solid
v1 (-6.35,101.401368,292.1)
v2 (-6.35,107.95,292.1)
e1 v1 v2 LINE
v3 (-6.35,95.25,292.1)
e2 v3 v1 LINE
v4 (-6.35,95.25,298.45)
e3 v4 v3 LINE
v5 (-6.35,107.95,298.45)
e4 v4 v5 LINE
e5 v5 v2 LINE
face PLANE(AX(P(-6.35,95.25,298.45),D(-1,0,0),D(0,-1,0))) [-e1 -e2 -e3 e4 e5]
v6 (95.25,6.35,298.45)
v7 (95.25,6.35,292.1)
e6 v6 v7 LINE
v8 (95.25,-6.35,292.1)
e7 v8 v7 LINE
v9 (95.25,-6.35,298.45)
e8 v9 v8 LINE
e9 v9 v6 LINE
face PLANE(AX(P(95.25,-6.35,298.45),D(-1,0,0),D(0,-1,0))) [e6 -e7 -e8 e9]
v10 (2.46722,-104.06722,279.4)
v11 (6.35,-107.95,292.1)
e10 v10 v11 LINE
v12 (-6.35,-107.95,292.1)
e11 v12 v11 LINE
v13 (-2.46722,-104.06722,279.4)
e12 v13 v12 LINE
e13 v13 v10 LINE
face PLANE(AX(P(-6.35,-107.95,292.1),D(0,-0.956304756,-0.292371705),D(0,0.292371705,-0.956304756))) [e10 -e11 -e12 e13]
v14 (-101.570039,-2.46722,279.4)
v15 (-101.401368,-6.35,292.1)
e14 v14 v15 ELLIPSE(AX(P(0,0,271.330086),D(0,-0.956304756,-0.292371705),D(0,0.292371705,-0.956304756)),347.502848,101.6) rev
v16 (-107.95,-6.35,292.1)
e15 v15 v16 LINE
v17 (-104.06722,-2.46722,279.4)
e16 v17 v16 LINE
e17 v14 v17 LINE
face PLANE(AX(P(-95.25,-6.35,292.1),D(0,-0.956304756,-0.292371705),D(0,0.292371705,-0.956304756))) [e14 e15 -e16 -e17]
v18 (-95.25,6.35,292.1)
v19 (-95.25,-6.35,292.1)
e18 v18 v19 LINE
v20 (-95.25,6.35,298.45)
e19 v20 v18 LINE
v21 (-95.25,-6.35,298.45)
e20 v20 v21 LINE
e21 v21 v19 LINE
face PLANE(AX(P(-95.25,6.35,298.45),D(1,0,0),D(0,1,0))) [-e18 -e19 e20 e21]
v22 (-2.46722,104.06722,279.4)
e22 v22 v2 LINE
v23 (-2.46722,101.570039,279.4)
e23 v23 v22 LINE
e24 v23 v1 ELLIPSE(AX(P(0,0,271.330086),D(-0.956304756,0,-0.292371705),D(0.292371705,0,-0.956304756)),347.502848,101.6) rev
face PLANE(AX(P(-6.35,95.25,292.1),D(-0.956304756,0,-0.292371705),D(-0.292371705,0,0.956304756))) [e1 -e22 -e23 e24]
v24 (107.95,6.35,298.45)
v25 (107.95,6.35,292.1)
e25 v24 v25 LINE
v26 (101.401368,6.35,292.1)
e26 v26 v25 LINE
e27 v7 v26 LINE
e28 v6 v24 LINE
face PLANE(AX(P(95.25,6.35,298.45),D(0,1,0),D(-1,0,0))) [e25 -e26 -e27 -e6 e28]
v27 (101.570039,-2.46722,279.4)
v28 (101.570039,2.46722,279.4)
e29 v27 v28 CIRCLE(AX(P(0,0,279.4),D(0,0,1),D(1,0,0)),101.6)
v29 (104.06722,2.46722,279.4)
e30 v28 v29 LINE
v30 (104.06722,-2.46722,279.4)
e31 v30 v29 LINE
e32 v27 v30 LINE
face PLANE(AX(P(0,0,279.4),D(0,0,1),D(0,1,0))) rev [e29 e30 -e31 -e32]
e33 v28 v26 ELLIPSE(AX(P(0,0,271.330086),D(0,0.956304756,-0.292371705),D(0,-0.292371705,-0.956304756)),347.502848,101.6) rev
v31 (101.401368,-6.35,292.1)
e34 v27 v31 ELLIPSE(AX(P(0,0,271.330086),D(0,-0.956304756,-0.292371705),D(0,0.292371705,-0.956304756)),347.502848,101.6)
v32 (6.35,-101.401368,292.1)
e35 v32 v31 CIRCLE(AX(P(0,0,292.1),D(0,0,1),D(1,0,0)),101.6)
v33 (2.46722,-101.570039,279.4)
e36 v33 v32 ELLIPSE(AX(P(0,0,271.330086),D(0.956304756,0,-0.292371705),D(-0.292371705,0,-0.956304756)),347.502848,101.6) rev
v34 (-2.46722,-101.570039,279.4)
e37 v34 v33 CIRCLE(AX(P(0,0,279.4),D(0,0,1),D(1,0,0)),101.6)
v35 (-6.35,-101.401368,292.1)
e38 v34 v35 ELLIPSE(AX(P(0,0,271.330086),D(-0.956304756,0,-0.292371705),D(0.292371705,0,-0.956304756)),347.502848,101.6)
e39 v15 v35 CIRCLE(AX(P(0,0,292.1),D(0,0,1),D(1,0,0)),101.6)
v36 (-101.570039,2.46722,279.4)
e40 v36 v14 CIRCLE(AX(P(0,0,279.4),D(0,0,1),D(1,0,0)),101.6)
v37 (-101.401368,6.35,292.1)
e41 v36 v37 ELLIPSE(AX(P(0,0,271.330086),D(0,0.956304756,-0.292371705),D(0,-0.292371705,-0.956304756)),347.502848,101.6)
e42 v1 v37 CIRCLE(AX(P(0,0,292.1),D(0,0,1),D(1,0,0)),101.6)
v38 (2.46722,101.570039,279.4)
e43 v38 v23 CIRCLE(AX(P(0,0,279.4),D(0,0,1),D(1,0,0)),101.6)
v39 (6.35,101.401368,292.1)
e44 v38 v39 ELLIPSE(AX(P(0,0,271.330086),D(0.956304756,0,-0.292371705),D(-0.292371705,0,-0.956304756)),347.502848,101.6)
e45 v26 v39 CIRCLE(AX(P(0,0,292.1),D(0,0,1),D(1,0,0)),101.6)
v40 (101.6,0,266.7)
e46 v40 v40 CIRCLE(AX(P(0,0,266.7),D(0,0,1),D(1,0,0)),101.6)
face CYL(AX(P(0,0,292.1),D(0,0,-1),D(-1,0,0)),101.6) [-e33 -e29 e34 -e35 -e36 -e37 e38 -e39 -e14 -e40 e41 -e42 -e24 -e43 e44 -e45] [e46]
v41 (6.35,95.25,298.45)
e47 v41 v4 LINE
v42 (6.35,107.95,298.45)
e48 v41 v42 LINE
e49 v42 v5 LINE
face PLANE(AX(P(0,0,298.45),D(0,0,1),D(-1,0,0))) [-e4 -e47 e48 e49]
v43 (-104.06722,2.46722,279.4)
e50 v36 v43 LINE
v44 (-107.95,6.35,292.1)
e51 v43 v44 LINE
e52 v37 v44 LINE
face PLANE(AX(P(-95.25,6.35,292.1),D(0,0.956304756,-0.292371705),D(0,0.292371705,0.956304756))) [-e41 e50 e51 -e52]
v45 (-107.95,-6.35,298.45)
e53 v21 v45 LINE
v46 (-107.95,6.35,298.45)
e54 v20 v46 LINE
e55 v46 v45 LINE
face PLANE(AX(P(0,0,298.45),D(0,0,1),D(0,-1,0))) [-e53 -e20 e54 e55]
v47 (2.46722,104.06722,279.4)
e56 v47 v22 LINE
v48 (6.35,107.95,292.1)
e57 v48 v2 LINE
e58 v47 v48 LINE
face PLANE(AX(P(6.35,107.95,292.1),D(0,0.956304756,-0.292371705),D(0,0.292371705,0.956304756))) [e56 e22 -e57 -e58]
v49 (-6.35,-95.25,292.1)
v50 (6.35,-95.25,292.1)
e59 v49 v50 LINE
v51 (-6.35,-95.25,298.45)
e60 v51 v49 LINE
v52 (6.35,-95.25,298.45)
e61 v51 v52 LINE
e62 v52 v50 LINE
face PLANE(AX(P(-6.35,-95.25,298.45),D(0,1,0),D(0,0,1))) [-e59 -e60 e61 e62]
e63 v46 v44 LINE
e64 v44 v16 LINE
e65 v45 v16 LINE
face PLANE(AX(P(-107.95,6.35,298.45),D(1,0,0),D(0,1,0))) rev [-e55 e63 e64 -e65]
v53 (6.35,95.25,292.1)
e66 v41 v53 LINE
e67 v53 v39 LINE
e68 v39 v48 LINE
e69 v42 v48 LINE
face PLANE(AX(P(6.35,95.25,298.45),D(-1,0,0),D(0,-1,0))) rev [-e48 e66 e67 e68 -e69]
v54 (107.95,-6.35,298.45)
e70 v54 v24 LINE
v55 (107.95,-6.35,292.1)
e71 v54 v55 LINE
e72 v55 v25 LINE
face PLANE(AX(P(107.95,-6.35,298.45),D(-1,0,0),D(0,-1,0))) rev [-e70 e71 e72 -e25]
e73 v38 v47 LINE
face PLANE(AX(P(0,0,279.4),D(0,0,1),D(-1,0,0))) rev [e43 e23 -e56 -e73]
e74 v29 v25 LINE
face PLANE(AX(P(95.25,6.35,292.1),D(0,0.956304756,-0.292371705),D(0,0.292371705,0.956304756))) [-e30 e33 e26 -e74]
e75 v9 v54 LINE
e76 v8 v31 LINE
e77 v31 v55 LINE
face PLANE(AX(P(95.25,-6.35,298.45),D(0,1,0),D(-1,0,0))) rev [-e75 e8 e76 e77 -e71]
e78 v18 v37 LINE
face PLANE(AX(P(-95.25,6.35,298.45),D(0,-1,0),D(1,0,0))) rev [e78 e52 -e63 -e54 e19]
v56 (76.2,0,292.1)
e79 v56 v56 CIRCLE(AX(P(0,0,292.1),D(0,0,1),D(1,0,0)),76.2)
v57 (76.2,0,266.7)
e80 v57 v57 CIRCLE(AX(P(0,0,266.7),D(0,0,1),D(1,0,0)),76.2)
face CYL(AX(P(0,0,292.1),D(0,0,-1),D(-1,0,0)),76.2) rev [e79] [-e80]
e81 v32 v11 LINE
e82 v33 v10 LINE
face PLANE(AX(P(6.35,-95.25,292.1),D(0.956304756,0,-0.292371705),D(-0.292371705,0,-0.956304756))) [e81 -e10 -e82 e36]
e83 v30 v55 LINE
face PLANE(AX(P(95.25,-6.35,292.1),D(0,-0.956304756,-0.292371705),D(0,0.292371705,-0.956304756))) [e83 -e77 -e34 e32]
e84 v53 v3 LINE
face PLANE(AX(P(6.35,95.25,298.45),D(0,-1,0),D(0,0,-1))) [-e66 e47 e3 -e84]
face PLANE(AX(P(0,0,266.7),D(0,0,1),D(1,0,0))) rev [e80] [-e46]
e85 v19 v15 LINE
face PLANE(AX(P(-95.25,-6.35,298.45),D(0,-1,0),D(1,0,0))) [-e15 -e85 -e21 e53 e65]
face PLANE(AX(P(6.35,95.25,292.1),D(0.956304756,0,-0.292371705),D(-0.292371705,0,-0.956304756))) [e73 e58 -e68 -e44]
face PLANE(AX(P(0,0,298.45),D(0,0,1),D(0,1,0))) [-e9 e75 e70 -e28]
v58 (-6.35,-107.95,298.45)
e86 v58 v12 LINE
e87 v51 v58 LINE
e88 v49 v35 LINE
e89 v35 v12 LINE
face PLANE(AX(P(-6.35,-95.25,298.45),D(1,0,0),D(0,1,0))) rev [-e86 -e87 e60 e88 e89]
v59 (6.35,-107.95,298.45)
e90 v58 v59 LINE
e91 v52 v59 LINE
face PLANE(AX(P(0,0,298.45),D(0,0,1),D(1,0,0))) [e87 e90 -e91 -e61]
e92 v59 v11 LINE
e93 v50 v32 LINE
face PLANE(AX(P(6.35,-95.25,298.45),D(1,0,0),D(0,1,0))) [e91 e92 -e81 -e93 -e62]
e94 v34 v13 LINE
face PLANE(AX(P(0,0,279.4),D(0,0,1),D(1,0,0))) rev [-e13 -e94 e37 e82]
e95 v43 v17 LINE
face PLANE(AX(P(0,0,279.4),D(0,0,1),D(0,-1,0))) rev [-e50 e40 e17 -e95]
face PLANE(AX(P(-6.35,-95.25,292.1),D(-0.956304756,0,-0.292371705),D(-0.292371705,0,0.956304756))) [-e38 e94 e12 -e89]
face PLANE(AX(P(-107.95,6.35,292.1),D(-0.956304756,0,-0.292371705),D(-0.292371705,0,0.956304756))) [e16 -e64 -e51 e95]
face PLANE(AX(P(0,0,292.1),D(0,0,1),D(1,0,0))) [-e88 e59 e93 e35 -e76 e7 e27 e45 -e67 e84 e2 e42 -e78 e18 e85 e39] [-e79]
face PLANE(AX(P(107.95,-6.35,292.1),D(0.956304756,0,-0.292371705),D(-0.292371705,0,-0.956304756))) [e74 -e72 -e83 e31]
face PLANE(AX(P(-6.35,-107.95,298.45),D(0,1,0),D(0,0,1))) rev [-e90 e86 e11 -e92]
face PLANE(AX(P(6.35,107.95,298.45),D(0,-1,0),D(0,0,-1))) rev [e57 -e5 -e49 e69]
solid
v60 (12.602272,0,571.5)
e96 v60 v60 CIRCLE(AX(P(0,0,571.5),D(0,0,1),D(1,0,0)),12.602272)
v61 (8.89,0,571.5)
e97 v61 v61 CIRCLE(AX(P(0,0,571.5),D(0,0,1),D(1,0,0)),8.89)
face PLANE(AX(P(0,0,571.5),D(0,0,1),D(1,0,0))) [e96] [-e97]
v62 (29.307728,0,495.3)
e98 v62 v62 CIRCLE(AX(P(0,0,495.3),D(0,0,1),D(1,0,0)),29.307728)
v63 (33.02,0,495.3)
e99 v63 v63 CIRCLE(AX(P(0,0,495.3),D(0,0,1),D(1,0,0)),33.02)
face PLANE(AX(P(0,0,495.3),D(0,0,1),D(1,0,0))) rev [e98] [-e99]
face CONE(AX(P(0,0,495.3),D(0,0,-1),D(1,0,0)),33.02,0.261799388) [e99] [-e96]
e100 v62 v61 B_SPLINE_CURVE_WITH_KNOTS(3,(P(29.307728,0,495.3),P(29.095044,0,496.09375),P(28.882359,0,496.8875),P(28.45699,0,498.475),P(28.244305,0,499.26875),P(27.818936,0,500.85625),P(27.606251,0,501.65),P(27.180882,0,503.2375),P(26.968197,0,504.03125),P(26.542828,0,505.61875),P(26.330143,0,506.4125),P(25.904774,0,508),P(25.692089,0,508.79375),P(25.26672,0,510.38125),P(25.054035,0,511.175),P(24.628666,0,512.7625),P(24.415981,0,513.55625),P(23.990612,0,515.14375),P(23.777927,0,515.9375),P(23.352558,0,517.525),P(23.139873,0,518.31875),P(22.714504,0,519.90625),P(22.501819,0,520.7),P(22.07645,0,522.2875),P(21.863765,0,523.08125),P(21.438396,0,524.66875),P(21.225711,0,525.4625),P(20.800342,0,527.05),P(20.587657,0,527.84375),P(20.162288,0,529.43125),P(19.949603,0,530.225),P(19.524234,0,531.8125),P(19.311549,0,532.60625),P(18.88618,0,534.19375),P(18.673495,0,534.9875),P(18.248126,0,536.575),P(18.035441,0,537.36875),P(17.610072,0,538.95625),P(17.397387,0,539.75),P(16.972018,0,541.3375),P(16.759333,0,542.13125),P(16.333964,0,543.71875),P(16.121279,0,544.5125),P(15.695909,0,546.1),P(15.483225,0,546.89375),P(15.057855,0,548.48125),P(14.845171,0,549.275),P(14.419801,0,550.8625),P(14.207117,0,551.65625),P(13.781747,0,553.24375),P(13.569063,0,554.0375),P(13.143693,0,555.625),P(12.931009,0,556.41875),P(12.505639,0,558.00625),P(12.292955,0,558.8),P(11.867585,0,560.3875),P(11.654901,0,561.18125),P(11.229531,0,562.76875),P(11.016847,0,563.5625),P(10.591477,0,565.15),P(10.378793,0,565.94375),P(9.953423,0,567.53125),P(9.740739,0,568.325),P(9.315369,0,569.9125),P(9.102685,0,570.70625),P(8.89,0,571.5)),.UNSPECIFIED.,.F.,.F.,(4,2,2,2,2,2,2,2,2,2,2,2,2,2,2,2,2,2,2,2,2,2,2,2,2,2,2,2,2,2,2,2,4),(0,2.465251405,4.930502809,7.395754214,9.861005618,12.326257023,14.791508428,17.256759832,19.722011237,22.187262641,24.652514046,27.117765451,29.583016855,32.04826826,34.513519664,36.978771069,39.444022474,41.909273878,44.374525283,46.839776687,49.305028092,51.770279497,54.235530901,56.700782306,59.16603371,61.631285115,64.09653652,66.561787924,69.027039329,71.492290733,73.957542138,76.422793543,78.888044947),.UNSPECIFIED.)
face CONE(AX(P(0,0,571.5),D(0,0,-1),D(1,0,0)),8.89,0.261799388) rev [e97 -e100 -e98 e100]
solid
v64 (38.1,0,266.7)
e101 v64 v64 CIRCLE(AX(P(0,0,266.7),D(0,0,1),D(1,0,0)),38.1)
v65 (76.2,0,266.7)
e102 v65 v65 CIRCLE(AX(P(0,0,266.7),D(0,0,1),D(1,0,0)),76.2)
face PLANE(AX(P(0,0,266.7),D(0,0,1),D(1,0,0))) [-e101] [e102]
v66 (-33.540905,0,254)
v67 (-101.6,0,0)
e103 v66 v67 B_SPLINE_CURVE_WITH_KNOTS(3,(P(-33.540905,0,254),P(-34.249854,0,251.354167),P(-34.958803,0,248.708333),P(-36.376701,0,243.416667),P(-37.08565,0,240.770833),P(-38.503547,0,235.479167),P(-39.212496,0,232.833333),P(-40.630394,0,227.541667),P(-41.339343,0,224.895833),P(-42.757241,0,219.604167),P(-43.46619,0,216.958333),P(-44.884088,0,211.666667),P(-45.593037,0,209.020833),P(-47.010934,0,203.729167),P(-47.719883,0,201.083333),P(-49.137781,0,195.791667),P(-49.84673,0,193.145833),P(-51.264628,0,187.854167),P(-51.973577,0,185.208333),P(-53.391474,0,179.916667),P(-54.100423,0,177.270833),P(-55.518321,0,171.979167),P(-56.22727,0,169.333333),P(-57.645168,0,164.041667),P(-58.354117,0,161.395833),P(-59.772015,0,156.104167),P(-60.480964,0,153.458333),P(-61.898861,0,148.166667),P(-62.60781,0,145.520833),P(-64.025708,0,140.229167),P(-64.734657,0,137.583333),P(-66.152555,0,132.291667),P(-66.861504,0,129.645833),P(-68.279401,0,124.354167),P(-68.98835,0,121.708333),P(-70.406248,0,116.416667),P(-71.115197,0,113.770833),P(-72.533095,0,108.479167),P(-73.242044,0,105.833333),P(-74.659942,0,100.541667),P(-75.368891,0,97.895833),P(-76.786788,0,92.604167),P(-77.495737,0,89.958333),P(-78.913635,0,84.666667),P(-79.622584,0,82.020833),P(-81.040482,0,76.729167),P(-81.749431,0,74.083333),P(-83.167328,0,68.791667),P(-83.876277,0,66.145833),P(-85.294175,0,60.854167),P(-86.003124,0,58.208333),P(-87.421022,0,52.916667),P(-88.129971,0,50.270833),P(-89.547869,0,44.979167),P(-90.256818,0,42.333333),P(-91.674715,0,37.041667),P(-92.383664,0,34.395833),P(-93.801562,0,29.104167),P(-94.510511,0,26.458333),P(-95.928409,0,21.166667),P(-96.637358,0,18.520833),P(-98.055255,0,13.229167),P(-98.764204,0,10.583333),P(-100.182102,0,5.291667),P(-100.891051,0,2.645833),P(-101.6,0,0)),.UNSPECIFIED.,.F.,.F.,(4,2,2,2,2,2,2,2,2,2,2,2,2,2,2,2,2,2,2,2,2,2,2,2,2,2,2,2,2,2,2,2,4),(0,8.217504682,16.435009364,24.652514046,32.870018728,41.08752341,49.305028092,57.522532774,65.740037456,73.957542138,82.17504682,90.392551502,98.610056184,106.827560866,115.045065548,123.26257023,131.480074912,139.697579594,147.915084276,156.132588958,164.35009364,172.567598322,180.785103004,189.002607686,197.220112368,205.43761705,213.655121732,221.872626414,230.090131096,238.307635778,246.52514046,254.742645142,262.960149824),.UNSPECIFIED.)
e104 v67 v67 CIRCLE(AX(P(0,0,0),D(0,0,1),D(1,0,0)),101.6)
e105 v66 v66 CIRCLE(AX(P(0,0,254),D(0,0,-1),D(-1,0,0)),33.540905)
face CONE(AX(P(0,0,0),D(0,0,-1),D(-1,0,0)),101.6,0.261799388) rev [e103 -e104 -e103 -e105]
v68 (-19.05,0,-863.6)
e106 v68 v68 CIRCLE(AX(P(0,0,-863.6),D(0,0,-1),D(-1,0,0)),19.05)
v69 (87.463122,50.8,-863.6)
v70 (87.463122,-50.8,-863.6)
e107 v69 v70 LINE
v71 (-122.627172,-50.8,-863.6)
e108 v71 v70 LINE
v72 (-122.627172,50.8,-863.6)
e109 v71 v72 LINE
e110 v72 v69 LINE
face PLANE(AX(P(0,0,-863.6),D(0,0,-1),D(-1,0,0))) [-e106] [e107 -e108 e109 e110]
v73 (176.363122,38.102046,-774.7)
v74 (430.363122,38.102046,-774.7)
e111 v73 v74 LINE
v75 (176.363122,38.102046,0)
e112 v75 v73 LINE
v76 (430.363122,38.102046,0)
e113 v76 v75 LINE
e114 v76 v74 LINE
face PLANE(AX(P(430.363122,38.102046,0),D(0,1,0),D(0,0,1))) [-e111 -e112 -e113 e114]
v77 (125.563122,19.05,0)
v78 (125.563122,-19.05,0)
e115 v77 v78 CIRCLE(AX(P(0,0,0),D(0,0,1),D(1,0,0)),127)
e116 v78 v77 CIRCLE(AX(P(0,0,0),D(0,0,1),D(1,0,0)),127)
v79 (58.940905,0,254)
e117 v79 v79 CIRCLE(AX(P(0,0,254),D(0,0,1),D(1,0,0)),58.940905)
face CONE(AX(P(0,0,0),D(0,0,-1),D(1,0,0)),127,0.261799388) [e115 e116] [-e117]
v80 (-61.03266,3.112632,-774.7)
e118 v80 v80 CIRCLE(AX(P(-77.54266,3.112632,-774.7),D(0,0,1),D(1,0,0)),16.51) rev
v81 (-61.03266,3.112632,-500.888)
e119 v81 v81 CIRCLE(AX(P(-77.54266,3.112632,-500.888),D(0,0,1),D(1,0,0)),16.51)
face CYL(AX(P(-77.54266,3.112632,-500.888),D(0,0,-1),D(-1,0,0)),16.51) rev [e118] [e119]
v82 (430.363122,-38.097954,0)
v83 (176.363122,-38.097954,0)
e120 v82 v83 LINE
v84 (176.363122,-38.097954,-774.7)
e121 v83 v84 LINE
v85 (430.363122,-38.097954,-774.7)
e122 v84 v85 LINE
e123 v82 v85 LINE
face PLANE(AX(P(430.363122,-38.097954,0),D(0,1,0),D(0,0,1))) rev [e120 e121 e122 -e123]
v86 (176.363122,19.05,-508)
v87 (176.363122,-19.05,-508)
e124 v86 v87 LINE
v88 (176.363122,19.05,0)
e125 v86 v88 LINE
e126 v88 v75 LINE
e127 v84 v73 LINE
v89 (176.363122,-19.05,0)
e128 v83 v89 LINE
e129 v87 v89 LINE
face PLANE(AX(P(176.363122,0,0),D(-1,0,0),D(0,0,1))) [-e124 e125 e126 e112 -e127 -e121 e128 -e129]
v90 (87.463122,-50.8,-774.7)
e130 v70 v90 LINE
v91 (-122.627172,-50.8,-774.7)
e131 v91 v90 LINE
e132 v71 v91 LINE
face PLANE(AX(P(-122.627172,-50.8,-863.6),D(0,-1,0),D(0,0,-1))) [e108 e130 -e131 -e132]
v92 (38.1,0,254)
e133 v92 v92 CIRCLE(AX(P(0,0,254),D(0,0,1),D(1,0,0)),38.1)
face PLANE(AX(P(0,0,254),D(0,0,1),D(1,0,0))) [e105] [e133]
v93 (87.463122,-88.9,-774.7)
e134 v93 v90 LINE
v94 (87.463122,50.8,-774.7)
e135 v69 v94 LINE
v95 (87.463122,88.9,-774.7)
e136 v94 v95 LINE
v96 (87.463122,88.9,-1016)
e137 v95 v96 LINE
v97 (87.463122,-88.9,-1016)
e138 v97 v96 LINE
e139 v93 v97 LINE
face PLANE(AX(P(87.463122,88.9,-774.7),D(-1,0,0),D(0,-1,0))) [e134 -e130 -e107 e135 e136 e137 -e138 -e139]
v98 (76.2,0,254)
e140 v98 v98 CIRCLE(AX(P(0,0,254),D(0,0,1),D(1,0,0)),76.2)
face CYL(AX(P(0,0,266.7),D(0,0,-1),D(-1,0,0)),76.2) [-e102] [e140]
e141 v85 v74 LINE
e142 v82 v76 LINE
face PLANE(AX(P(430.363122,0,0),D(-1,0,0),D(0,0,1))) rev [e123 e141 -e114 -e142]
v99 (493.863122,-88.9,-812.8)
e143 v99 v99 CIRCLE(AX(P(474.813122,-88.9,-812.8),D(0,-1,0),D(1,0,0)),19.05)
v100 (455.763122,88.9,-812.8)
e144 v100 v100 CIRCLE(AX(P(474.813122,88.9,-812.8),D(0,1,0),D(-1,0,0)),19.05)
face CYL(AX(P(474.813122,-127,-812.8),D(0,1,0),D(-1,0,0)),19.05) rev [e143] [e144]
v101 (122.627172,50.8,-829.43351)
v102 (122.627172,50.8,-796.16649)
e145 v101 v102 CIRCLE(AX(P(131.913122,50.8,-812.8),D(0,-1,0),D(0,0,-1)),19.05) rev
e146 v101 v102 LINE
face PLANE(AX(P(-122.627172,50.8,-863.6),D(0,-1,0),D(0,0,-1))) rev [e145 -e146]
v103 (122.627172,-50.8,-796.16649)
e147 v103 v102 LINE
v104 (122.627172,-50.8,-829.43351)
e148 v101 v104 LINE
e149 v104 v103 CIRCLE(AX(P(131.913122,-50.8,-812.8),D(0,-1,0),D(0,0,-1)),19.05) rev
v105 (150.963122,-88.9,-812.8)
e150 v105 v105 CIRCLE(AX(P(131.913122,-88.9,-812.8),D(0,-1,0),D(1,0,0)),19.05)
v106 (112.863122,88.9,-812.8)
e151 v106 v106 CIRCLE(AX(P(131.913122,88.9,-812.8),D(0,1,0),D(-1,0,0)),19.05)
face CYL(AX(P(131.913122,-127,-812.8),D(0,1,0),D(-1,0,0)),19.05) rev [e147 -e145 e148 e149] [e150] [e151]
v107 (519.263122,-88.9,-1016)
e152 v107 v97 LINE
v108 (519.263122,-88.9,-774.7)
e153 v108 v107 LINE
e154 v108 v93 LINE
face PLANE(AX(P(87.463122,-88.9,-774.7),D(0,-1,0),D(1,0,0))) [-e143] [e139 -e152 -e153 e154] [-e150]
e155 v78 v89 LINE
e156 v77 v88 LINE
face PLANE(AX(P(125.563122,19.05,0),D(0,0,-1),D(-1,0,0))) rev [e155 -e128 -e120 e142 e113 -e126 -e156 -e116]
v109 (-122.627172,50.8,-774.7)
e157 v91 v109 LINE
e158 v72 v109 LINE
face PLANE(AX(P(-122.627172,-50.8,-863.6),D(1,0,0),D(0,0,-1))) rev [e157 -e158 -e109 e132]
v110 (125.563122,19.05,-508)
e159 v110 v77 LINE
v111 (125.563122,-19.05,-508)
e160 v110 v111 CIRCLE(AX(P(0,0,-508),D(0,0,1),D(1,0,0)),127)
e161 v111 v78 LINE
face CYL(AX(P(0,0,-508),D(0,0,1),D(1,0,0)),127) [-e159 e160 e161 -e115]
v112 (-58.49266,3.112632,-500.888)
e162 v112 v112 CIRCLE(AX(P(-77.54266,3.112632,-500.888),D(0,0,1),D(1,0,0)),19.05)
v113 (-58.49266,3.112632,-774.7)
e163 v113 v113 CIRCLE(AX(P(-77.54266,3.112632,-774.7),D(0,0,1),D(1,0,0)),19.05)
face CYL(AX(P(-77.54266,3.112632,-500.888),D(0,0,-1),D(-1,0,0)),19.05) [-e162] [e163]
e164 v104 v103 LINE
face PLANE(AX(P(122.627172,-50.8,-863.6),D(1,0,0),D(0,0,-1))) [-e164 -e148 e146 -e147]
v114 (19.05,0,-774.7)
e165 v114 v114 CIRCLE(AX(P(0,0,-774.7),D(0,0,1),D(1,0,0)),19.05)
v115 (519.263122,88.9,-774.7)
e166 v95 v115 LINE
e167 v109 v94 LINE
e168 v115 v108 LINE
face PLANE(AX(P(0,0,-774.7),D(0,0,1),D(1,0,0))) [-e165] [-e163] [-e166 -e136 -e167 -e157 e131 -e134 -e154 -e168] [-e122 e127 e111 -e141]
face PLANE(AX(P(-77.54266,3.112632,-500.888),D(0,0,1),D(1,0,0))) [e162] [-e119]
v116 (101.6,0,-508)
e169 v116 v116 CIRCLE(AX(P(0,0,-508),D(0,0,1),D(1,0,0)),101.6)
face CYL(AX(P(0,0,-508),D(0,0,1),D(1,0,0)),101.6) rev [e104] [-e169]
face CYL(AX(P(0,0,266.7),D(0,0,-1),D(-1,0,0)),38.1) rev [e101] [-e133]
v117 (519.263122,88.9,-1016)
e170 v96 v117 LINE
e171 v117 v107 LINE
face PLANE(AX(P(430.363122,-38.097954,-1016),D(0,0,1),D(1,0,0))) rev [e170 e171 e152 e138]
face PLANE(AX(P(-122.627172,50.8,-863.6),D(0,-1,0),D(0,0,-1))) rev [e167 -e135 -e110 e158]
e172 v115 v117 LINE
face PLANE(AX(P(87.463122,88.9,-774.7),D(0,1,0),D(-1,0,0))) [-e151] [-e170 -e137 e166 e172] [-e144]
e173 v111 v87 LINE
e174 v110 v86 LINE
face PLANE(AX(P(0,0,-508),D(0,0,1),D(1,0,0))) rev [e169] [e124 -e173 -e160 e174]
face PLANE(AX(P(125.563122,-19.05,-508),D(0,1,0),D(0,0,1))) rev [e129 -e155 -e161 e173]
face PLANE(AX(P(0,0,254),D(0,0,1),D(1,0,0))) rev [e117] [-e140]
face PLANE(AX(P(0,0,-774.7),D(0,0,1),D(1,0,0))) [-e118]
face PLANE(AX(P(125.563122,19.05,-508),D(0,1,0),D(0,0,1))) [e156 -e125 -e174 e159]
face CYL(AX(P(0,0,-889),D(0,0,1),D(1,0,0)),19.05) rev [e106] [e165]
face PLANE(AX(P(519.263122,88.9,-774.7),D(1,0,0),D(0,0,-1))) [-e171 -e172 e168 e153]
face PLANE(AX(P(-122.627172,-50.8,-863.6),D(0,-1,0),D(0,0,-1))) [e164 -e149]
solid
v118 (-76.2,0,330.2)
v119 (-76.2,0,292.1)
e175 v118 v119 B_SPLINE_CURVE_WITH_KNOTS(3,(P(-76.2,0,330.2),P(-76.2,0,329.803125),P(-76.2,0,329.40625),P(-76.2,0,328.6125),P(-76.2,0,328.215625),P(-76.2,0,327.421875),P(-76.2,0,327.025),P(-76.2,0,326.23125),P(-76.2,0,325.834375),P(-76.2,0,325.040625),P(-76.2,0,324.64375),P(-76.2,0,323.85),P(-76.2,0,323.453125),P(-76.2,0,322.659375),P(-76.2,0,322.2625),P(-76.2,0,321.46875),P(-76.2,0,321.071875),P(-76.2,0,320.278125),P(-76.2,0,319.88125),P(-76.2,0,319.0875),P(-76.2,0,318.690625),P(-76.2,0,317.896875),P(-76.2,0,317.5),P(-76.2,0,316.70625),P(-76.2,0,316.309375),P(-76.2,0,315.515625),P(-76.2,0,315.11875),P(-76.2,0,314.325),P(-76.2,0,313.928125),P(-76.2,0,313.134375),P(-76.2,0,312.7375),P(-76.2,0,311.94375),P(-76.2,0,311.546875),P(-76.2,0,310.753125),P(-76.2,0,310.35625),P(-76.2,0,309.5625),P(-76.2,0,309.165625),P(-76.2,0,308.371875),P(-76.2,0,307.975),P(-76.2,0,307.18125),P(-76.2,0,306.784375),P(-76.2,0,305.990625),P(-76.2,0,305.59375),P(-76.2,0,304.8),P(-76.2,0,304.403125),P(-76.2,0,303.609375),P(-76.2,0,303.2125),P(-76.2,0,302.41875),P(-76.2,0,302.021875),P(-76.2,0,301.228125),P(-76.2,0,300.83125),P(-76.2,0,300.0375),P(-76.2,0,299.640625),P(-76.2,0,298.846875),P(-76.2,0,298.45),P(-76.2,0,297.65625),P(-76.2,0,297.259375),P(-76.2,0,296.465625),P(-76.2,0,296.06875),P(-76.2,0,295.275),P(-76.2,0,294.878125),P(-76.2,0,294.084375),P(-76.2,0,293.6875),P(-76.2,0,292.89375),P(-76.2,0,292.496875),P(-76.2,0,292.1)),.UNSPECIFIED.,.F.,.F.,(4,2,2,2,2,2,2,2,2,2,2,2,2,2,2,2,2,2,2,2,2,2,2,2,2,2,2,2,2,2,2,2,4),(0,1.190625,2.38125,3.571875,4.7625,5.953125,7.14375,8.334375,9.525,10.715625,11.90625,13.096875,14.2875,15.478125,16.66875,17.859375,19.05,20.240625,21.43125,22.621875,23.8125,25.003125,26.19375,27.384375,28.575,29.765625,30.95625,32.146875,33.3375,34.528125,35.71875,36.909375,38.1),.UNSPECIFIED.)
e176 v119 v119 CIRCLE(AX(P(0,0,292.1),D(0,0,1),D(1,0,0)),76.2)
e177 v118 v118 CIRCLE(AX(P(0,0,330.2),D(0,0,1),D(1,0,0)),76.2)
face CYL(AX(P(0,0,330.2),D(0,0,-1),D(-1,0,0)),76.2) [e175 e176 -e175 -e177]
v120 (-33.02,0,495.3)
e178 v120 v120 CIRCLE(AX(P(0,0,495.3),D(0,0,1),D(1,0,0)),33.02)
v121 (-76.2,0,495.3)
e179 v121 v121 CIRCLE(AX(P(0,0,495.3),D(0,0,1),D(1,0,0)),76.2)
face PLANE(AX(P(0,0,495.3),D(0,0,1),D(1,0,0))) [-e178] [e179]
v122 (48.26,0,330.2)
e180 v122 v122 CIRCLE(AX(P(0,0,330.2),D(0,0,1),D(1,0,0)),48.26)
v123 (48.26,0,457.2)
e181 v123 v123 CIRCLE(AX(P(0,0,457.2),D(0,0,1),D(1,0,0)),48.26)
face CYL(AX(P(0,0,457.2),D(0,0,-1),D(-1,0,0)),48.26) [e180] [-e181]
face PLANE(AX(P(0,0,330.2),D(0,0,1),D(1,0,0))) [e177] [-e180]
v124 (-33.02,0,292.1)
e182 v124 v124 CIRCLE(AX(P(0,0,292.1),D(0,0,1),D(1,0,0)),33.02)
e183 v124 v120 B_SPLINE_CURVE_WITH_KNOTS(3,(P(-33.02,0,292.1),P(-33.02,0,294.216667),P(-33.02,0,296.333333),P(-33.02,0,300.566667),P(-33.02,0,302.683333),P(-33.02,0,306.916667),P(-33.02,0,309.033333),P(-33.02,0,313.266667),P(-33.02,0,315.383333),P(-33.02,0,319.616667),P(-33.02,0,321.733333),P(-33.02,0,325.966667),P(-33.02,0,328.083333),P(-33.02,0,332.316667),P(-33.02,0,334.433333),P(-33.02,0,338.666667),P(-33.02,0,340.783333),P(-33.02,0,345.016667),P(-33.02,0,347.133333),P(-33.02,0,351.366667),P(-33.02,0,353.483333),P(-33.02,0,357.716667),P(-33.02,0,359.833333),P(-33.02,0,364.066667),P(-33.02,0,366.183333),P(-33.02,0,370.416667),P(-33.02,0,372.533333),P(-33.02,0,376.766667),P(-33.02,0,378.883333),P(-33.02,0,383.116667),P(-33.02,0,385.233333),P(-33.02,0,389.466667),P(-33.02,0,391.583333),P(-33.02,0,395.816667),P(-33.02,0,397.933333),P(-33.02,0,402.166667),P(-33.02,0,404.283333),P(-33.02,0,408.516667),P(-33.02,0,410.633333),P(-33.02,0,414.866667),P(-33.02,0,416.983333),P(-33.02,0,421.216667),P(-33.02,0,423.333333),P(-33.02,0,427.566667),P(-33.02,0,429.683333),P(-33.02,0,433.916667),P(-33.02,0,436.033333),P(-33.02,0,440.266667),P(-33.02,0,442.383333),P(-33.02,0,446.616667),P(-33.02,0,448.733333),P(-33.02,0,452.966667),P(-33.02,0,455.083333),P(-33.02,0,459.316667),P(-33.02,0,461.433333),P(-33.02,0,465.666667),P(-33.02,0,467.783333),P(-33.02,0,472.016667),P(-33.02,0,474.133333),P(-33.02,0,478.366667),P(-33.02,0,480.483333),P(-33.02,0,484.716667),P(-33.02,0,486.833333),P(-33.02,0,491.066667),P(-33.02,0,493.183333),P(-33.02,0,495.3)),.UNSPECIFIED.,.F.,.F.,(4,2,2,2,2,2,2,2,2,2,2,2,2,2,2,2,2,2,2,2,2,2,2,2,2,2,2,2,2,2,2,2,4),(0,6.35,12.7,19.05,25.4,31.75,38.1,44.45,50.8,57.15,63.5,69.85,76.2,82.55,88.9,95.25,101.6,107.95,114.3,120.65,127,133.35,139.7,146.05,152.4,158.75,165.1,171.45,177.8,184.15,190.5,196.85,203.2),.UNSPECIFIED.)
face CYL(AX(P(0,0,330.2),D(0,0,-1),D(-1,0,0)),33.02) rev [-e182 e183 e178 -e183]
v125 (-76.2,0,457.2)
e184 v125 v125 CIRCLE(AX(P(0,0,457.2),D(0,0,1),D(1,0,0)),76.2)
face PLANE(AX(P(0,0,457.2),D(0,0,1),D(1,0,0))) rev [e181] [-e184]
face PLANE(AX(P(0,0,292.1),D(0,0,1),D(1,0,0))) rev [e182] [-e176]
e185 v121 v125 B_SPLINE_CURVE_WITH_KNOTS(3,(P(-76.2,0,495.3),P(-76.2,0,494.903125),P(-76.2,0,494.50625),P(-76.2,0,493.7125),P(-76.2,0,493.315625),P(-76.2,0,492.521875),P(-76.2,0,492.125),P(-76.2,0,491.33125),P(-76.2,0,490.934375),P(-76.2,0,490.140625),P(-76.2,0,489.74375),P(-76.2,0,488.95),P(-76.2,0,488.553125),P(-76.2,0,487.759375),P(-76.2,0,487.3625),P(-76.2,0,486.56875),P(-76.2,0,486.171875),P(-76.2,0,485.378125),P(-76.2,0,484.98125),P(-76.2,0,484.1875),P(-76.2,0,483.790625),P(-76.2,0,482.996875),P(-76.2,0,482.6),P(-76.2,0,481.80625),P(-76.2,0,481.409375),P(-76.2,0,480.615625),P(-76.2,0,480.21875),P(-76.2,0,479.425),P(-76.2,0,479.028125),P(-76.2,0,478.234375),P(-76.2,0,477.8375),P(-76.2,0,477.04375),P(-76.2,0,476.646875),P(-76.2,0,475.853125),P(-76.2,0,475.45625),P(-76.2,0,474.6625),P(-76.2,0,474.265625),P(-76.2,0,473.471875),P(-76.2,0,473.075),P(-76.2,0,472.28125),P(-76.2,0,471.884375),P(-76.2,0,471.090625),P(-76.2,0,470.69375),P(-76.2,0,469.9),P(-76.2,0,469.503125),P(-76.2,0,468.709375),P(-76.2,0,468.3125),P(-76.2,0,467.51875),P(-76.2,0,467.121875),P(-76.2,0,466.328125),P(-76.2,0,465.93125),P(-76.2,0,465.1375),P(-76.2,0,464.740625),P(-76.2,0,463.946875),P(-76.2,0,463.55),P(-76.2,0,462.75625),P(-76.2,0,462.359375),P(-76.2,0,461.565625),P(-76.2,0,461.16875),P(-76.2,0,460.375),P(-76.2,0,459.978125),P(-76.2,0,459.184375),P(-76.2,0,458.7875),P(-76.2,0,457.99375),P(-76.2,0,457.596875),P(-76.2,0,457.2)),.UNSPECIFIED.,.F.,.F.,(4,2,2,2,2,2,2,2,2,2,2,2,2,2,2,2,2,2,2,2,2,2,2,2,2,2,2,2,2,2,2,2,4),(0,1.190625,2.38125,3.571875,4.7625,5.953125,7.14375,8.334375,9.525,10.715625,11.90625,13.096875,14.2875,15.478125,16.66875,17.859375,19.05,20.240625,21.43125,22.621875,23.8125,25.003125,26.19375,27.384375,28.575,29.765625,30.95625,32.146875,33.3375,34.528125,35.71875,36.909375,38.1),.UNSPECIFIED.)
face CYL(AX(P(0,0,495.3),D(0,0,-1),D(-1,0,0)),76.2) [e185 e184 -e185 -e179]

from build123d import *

# Parameters (mm, degrees)
SKETCH1_R                     = 127
BOSS_EXTRUDE1_DEPTH           = 254
BOSS_EXTRUDE1_TAPER           = 15
SKETCH4_R                     = 101.6
CUT_EXTRUDE1_DEPTH            = 254
CUT_EXTRUDE1_DRAFT            = -15
SKETCH1_6_R                   = 127
SKETCH1_6_R_2                 = 101.6
EXTRUDE_THIN2_DEPTH           = 508
SKETCH7_R                     = 76.2
SKETCH7_R_2                   = 38.1
EXTRUDE_THIN3_DEPTH           = 12.7
EXTRUDE_THIN4_START           = 12.7
SKETCH7_3_R                   = 101.6
SKETCH7_3_R_2                 = 76.2
EXTRUDE_THIN4_DEPTH           = 25.4
EXTRUDE_THIN5_START           = 38.1
SKETCH7_4_R                   = 76.2
SKETCH7_4_R_2                 = 33.02
EXTRUDE_THIN5_DEPTH           = 38.1
SKETCH9_R                     = 48.26
SKETCH9_R_2                   = 33.02
EXTRUDE_THIN6_DEPTH           = 127
EXTRUDE_THIN7_START           = 203.2
SKETCH7_6_R                   = 76.2
SKETCH7_6_R_2                 = 33.02
EXTRUDE_THIN7_DEPTH           = 38.1
BOSS_EXTRUDE3_START           = 165.1
SKETCH9_2_R                   = 33.02
BOSS_EXTRUDE3_DEPTH           = 76.2
BOSS_EXTRUDE3_TAPER           = 15
SKETCH10_R                    = 8.89
CUT_EXTRUDE2_DEPTH            = 76.2
CUT_EXTRUDE2_DRAFT            = 15
SKETCH12_W                    = 12.7
SKETCH12_H                    = 12.7
BOSS_EXTRUDE4_DEPTH           = 12.7
BOSS_EXTRUDE4_TAPER           = 17
BOSS_EXTRUDE4_OTHER_WAY_DEPTH = 6.35
CIRPATTERN1_START             = -104.067220345
CIRPATTERN1_DEPTH             = 8.817220345
CIRPATTERN1_START_2           = 95.25
CIRPATTERN1_2_DEPTH           = 8.817220345
CIRPATTERN1_3_DEPTH           = 12.7
CIRPATTERN1_START_3           = -6.35
CIRPATTERN1_4_DEPTH           = 12.7
CIRPATTERN1_START_4           = -95.25
CIRPATTERN1_5_DEPTH           = 190.5
CIRPATTERN1_START_5           = -109
CIRPATTERN1_6_DEPTH           = 4.932779655
CIRPATTERN1_START_6           = 104.067220345
CIRPATTERN1_7_DEPTH           = 4.932779655
BOSS_EXTRUDE14_START          = -508
BOSS_EXTRUDE14_DEPTH          = 508
SKETCH16_W                    = 4.430078534
SKETCH16_H                    = 38.095908877
CUT_EXTRUDE3_DEPTH            = 612.844825099
SKETCH17_W                    = 1016
SKETCH17_H                    = 76.2
BOSS_EXTRUDE15_DEPTH          = 254
SKETCH19_W                    = 431.8
SKETCH19_H                    = 177.8
BOSS_EXTRUDE16_DEPTH          = 241.3
SKETCH22_R                    = 19.05
CUT_EXTRUDE7_DEPTH            = 1162.250618699
SKETCH21_R                    = 19.05
CUT_EXTRUDE8_DEPTH            = 1162.250618699
BOSS_EXTRUDE21_START          = -774.7
SKETCH26_W                    = 245.254344596
SKETCH26_H                    = 101.6
BOSS_EXTRUDE21_DEPTH          = 88.9
CUT_EXTRUDE11_START           = -762
SKETCH27_R                    = 19.05
CUT_EXTRUDE11_DEPTH           = 127
EXTRUDE_THIN8_START           = -774.7
SKETCH26_9_R                  = 19.05
SKETCH26_9_R_2                = 16.51
EXTRUDE_THIN8_DEPTH           = 273.812


with BuildPart() as part:
    # Sketch1 → Boss-Extrude1 (new body)
    with BuildSketch(Plane.XY):
        Circle(SKETCH1_R)
    extrude(amount=BOSS_EXTRUDE1_DEPTH, taper=BOSS_EXTRUDE1_TAPER)


with BuildPart() as cut_extrude1_tool:
    # Sketch4 → Cut-Extrude1 (with draft: the straight prism first)
    with BuildSketch(Plane(origin=(0, 0, 0), x_dir=(-1, 0, 0), z_dir=(0, 0, -1))):
        Circle(SKETCH4_R)
    extrude(amount=-CUT_EXTRUDE1_DEPTH)
    # Cut-Extrude1: the draft: its side faces are tilted about the plane it starts from
    cut_extrude1_sides = [cut_extrude1_tool.faces().sort_by_distance(p)[0] for p in [
        (101.6, 0, 127),
    ]]
    draft(cut_extrude1_sides, Plane(origin=(0, 0, 0), x_dir=(-1, 0, 0), z_dir=(0, 0, -1)), CUT_EXTRUDE1_DRAFT)


with BuildPart() as part_1:
    add(part.part)

    # Cut-Extrude1: cut by cut_extrude1_tool
    add(cut_extrude1_tool.part, mode=Mode.SUBTRACT)

    # Sketch1<6> → Extrude-Thin2 (add)
    with BuildSketch(Plane.XY):
        Circle(SKETCH1_6_R)
        Circle(SKETCH1_6_R_2, mode=Mode.SUBTRACT)
    extrude(amount=-EXTRUDE_THIN2_DEPTH)

    # Sketch7 → Extrude-Thin3 (add)
    with BuildSketch(Plane.XY.offset(254)):
        Circle(SKETCH7_R)
        Circle(SKETCH7_R_2, mode=Mode.SUBTRACT)
    extrude(amount=EXTRUDE_THIN3_DEPTH)

    # Boss-Extrude14: read off the stored shape, not the designer's step
    # Boss-Extrude14 outline → Boss-Extrude14 (add)
    with BuildSketch(Plane.XY.offset(BOSS_EXTRUDE14_START)):
        with BuildLine():
            Line((125.563121576, -19.05), (176.363121576, -19.05))
            ThreePointArc((176.363121576, -19.05), (177.8, 0), (176.363121576, 19.05))
            Line((176.363121576, 19.05), (125.563121576, 19.05))
            ThreePointArc((125.563121576, 19.05), (127, 0), (125.563121576, -19.05))
        make_face()
    extrude(amount=BOSS_EXTRUDE14_DEPTH)

    # Sketch16 → Cut-Extrude3 (cut, through all)
    with BuildSketch(Plane.XY):
        with Locations((178.578160843, 0.002045561)):
            Rectangle(SKETCH16_W, SKETCH16_H)
    extrude(amount=-CUT_EXTRUDE3_DEPTH, mode=Mode.SUBTRACT)

    # Sketch17 → Boss-Extrude15 (add)
    with BuildSketch(Plane(origin=(176.363121576, 0, 0), x_dir=(0, 0, -1), z_dir=(1, 0, 0))):
        with Locations((508, 0.002045562)):
            Rectangle(SKETCH17_W, SKETCH17_H)
    extrude(amount=BOSS_EXTRUDE15_DEPTH)

    # Sketch19 → Boss-Extrude16 (add)
    with BuildSketch(Plane(origin=(0, 0, -1016), x_dir=(-1, 0, 0), z_dir=(0, 0, -1))):
        with Locations((-303.363121576, 0)):
            Rectangle(SKETCH19_W, SKETCH19_H)
    extrude(amount=-BOSS_EXTRUDE16_DEPTH)

    # Sketch22 → Cut-Extrude7 (cut, through all)
    with BuildSketch(Plane(origin=(0, 88.9, 0), x_dir=(1, 0, 0), z_dir=(0, 1, 0))):
        with Locations(Location((131.913121576, 812.8, 0), (0, 0, 180))):
            Circle(SKETCH22_R)
    extrude(amount=-CUT_EXTRUDE7_DEPTH, mode=Mode.SUBTRACT)

    # Sketch21 → Cut-Extrude8 (cut, through all)
    with BuildSketch(Plane(origin=(0, 88.9, 0), x_dir=(1, 0, 0), z_dir=(0, 1, 0))):
        with Locations(Location((474.813121576, 812.8, 0), (0, 0, 180))):
            Circle(SKETCH21_R)
    extrude(amount=-CUT_EXTRUDE8_DEPTH, mode=Mode.SUBTRACT)

    # Sketch26 → Boss-Extrude21 (add)
    with BuildSketch(Plane.XY.offset(BOSS_EXTRUDE21_START)):
        Rectangle(SKETCH26_W, SKETCH26_H)
    extrude(amount=-BOSS_EXTRUDE21_DEPTH)

    # Sketch27 → Cut-Extrude11 (cut)
    with BuildSketch(Plane.XY.offset(CUT_EXTRUDE11_START)):
        Circle(SKETCH27_R)
    extrude(amount=-CUT_EXTRUDE11_DEPTH, mode=Mode.SUBTRACT)

    # Sketch26<9> → Extrude-Thin8 (add)
    with BuildSketch(Plane.XY.offset(EXTRUDE_THIN8_START)):
        with Locations((-77.542660474, 3.112631732)):
            Circle(SKETCH26_9_R)
        with Locations((-77.542660474, 3.112631732)):
            Circle(SKETCH26_9_R_2, mode=Mode.SUBTRACT)
    extrude(amount=EXTRUDE_THIN8_DEPTH)


with BuildPart() as body_2:
    # Sketch7<3> → Extrude-Thin4 (new body)
    with BuildSketch(Plane.XY.offset(254).offset(EXTRUDE_THIN4_START)):
        Circle(SKETCH7_3_R)
        Circle(SKETCH7_3_R_2, mode=Mode.SUBTRACT)
    extrude(amount=EXTRUDE_THIN4_DEPTH)

    # Sketch12 → Boss-Extrude4 (add)
    with BuildSketch(Plane.XY.offset(292.1)):
        with Locations((0, -101.6)):
            Rectangle(SKETCH12_W, SKETCH12_H)
    extrude(amount=-BOSS_EXTRUDE4_DEPTH, taper=BOSS_EXTRUDE4_TAPER)

    # Sketch12 → Boss-Extrude4 other way (add)
    with BuildSketch(Plane.XY.offset(292.1)):
        with Locations((0, -101.6)):
            Rectangle(SKETCH12_W, SKETCH12_H)
    extrude(amount=BOSS_EXTRUDE4_OTHER_WAY_DEPTH)

    # CirPattern1: read off the stored shape, not the designer's step
    # CirPattern1 outline → CirPattern1 (add)
    with BuildSketch(Plane.YZ.offset(CIRPATTERN1_START)):
        Polygon((6.35, 292.1), (6.35, 298.45), (-6.35, 298.45), (-6.35, 292.1), (-2.467220345, 279.4), (2.467220345, 279.4), align=None)
    extrude(amount=CIRPATTERN1_DEPTH)

    # CirPattern1 2 outline → CirPattern1 2 (add)
    with BuildSketch(Plane.YZ.offset(CIRPATTERN1_START_2)):
        Polygon((6.35, 292.1), (6.35, 298.45), (-6.35, 298.45), (-6.35, 292.1), (-2.467220345, 279.4), (2.467220345, 279.4), align=None)
    extrude(amount=CIRPATTERN1_2_DEPTH)

    # CirPattern1 3 outline → CirPattern1 3 (add)
    with BuildSketch(Plane(origin=(0, 0, 0), x_dir=(1, 0, 0), z_dir=(0, 1, 0)).offset(CIRPATTERN1_START_2)):
        Polygon((-2.467220345, -279.4), (-6.35, -292.1), (-6.35, -298.45), (6.35, -298.45), (6.35, -292.1), (2.467220345, -279.4), align=None)
    extrude(amount=CIRPATTERN1_3_DEPTH)

    # CirPattern1 4 outline → CirPattern1 4 (add)
    with BuildSketch(Plane(origin=(0, 0, 0), x_dir=(1, 0, 0), z_dir=(0, 1, 0)).offset(CIRPATTERN1_START_3)):
        Polygon((104.067220345, -279.4), (104.067220345, -298.45), (107.95, -298.45), (107.95, -292.1), align=None)
        Polygon((-107.95, -292.1), (-107.95, -298.45), (-104.067220345, -298.45), (-104.067220345, -279.4), align=None)
    extrude(amount=CIRPATTERN1_4_DEPTH)

    # CirPattern1 5 outline → CirPattern1 5 (cut)
    with BuildSketch(Plane.YZ.offset(CIRPATTERN1_START_4)):
        Polygon((107.95, 279.4), (107.95, 292.1), (104.067220345, 279.4), align=None)
    extrude(amount=CIRPATTERN1_5_DEPTH, mode=Mode.SUBTRACT)

    # CirPattern1 6 outline → CirPattern1 6 (cut)
    with BuildSketch(Plane.YZ.offset(CIRPATTERN1_START_5)):
        Polygon((-2.467220345, 279.4), (-6.35, 292.1), (-6.35, 279.4), align=None)
        Polygon((6.35, 292.1), (2.467220345, 279.4), (6.35, 279.4), align=None)
    extrude(amount=CIRPATTERN1_6_DEPTH, mode=Mode.SUBTRACT)

    # CirPattern1 7 outline → CirPattern1 7 (cut)
    with BuildSketch(Plane.YZ.offset(CIRPATTERN1_START_6)):
        Polygon((-2.467220345, 279.4), (-6.35, 292.1), (-6.35, 279.4), align=None)
        Polygon((6.35, 292.1), (2.467220345, 279.4), (6.35, 279.4), align=None)
    extrude(amount=CIRPATTERN1_7_DEPTH, mode=Mode.SUBTRACT)


with BuildPart() as body_3:
    # Sketch7<4> → Extrude-Thin5 (new body)
    with BuildSketch(Plane.XY.offset(254).offset(EXTRUDE_THIN5_START)):
        Circle(SKETCH7_4_R)
        Circle(SKETCH7_4_R_2, mode=Mode.SUBTRACT)
    extrude(amount=EXTRUDE_THIN5_DEPTH)

    # Sketch9 → Extrude-Thin6 (add)
    with BuildSketch(Plane.XY.offset(330.2)):
        Circle(SKETCH9_R)
        Circle(SKETCH9_R_2, mode=Mode.SUBTRACT)
    extrude(amount=EXTRUDE_THIN6_DEPTH)

    # Sketch7<6> → Extrude-Thin7 (add)
    with BuildSketch(Plane.XY.offset(254).offset(EXTRUDE_THIN7_START)):
        Circle(SKETCH7_6_R)
        Circle(SKETCH7_6_R_2, mode=Mode.SUBTRACT)
    extrude(amount=EXTRUDE_THIN7_DEPTH)


with BuildPart() as body_4:
    # Sketch9<2> → Boss-Extrude3 (new body)
    with BuildSketch(Plane.XY.offset(330.2).offset(BOSS_EXTRUDE3_START)):
        with Locations(Location((0, 0, 0), (0, 0, 180))):
            Circle(SKETCH9_2_R)
    extrude(amount=BOSS_EXTRUDE3_DEPTH, taper=BOSS_EXTRUDE3_TAPER)


with BuildPart() as cut_extrude2_tool:
    # Sketch10 → Cut-Extrude2 (with draft: the straight prism first)
    with BuildSketch(Plane.XY.offset(571.5)):
        Circle(SKETCH10_R)
    extrude(amount=-CUT_EXTRUDE2_DEPTH)
    # Cut-Extrude2: the draft: its side faces are tilted about the plane it starts from
    cut_extrude2_sides = [cut_extrude2_tool.faces().sort_by_distance(p)[0] for p in [
        (-8.89, 0, 533.4),
    ]]
    draft(cut_extrude2_sides, Plane.XY.offset(571.5), CUT_EXTRUDE2_DRAFT)


with BuildPart() as body_4_1:
    add(body_4.part)

    # Cut-Extrude2: cut by cut_extrude2_tool
    add(cut_extrude2_tool.part, mode=Mode.SUBTRACT)


solid = Compound([part_1.part, body_2.part, body_3.part, body_4_1.part])
